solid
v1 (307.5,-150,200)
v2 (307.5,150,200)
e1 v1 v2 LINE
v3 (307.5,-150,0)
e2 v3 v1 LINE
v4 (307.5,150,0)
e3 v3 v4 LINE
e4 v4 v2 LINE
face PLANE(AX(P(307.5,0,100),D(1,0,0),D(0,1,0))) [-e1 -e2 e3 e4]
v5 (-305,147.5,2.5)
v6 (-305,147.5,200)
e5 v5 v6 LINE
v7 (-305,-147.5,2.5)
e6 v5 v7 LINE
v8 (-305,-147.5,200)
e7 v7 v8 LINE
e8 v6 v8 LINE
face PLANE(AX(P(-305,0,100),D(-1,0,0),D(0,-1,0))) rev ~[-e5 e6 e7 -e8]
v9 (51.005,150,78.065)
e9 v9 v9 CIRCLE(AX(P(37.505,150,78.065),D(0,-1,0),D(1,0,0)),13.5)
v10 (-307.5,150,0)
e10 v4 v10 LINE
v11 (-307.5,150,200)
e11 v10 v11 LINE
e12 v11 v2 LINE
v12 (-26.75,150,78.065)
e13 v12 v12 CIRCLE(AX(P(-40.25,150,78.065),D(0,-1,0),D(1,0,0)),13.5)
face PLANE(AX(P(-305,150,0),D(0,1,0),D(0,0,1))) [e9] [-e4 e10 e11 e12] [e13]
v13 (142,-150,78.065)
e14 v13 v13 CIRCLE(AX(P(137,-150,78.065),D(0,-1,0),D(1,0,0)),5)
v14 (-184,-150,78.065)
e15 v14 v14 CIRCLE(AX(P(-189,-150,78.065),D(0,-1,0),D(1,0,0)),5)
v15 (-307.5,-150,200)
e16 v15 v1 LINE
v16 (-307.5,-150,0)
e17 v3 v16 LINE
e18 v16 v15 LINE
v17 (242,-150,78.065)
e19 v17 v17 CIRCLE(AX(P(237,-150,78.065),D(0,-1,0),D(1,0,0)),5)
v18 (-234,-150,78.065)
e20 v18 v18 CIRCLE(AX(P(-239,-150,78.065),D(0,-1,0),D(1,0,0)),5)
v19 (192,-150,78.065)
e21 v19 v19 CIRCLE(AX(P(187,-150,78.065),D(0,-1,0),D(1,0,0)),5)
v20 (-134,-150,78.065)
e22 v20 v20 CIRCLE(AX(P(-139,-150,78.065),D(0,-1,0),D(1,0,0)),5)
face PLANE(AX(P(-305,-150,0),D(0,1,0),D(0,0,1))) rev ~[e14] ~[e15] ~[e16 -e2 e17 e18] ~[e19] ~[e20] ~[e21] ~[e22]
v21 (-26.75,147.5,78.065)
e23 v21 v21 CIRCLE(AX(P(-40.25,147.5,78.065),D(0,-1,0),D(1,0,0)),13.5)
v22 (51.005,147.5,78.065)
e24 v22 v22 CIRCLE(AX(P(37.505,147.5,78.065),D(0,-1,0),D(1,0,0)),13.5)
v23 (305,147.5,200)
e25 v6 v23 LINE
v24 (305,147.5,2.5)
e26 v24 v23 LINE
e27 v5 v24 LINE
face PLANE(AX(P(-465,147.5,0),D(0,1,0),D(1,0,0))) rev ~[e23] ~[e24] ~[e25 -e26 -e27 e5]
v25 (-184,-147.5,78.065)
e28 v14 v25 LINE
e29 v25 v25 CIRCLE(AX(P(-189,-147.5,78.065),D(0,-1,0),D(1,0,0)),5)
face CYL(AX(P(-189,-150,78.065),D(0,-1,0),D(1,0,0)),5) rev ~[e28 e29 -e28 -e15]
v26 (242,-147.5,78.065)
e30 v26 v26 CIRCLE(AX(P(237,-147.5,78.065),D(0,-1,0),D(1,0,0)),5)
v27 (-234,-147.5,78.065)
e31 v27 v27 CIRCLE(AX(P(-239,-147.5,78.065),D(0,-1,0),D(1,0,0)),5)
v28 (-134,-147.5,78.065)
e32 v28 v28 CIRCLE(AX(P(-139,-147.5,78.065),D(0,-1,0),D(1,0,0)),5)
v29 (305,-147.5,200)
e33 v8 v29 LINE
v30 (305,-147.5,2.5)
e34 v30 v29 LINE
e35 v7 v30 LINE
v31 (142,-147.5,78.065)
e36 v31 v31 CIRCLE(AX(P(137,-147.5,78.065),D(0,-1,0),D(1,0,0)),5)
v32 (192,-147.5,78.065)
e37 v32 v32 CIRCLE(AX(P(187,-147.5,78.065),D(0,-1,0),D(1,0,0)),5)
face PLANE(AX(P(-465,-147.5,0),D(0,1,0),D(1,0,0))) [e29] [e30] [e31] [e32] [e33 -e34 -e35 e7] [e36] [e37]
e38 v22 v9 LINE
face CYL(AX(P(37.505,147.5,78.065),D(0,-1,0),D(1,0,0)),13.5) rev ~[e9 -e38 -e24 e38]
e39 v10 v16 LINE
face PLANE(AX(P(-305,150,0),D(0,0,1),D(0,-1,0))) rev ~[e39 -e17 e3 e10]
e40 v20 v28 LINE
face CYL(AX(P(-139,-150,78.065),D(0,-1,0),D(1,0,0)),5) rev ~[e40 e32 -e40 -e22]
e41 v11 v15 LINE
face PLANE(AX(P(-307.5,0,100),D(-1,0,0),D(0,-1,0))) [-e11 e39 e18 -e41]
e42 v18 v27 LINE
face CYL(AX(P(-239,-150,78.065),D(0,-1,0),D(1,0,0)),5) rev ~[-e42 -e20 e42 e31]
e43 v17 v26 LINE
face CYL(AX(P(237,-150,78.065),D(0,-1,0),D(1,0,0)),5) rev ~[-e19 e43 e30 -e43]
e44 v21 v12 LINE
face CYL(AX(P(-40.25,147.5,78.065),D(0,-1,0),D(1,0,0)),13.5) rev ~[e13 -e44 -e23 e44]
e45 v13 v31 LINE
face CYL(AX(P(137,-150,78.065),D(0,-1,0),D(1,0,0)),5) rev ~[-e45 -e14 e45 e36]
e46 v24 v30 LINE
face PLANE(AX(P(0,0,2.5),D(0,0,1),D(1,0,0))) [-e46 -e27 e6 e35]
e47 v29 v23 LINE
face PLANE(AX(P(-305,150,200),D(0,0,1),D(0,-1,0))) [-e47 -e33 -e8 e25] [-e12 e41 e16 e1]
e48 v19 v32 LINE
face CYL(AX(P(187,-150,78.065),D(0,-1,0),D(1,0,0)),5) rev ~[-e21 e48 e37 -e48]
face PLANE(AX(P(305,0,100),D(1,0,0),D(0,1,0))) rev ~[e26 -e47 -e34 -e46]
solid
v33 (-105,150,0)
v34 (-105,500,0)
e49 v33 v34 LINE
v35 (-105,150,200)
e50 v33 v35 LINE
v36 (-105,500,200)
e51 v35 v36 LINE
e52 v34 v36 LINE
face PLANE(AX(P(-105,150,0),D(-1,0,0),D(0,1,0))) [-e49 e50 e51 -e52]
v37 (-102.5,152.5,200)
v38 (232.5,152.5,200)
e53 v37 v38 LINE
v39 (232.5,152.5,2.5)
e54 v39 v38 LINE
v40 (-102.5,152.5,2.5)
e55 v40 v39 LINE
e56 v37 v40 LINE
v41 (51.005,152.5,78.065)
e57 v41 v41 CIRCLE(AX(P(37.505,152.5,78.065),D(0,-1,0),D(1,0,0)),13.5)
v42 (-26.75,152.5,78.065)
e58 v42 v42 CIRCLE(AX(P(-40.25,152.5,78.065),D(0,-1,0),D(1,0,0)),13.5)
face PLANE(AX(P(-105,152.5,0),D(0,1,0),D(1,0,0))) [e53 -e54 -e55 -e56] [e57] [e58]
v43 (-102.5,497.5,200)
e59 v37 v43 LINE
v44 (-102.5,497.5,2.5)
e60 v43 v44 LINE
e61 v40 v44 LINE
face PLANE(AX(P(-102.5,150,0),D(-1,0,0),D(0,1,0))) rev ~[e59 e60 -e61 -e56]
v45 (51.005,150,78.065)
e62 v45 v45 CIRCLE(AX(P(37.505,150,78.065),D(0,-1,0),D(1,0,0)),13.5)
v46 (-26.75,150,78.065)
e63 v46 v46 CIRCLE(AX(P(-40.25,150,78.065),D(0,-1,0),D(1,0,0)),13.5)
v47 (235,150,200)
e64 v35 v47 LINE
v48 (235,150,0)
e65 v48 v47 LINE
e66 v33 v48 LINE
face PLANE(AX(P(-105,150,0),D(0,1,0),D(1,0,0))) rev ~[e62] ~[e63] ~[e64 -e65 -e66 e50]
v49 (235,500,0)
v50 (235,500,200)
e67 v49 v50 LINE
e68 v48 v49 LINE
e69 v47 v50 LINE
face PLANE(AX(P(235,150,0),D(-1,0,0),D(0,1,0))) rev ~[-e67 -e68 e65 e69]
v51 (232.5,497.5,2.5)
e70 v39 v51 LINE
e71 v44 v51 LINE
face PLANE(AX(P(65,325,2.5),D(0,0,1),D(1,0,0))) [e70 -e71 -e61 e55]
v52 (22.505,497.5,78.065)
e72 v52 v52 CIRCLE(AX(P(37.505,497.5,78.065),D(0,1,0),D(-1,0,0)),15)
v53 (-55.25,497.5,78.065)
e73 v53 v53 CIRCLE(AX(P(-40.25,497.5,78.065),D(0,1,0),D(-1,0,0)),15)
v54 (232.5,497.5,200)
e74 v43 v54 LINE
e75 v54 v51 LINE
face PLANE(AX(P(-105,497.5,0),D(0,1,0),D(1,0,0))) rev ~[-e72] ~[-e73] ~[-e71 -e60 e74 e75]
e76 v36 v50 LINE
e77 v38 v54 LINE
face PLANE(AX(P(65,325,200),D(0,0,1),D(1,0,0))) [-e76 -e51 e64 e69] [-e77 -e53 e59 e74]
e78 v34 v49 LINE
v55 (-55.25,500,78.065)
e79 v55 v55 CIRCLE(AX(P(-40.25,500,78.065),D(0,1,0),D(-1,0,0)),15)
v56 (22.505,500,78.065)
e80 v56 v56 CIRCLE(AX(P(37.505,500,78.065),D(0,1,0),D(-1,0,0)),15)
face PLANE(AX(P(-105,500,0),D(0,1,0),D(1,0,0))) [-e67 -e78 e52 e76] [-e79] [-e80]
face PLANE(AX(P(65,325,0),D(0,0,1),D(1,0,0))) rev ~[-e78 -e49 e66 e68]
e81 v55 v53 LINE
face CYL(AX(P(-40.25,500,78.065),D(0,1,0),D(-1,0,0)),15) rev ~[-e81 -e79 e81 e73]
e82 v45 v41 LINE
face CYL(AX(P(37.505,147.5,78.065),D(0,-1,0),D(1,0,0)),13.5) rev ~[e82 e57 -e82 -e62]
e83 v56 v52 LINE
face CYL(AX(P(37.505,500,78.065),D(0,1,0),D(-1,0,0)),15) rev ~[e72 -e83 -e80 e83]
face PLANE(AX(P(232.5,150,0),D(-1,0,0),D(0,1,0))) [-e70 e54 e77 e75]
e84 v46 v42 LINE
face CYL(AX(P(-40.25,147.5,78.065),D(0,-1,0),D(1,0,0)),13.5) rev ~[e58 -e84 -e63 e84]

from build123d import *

# Parameters (mm, degrees)
F0_W      = 930
F0_H      = 300
F2_DEPTH  = 200
F3_T      = -2.5
F1_W      = 340
F1_H      = 350
F4_DEPTH  = 200
F5_T      = -2.5
F6_R      = 5
F7_DEPTH  = 25
F8_R      = 13.5
F9_DEPTH  = 25
F10_R     = 15
F11_DEPTH = 25
F12_DEPTH = 160
F13_DEPTH = 160
F14_W     = 300
F14_H     = 200
F15_DEPTH = 2.5
F16_W     = 300
F16_H     = 200
F17_DEPTH = 2.5


# Not quite as in the source:
# - a feature names something its author has since deleted; it is built from what else it names


with BuildPart() as f2:
    # F0 (on Top) → F2 (new body)
    with BuildSketch(Plane.XY):
        Rectangle(F0_W, F0_H)
    extrude(amount=F2_DEPTH)

    # F3
    f3_openings = [f2.faces().sort_by_distance(p)[0] for p in [
        (0, 0, 200),
    ]]
    offset(amount=F3_T, openings=f3_openings)

    # F6 (on face) → F7 (cut)
    with BuildSketch(Plane.XZ.offset(150)):
        with Locations((137, 78.065)):
            Circle(F6_R)
        with Locations((187, 78.065)):
            Circle(F6_R)
        with Locations((237, 78.065)):
            Circle(F6_R)
        with Locations((387, 78.065)):
            Circle(F6_R)
        with Locations((337, 78.065)):
            Circle(F6_R)
        with Locations((-139, 78.065)):
            Circle(F6_R)
        with Locations((-189, 78.065)):
            Circle(F6_R)
        with Locations((-239, 78.065)):
            Circle(F6_R)
        with Locations((-339, 78.065)):
            Circle(F6_R)
        with Locations((-389, 78.065)):
            Circle(F6_R)
    extrude(amount=-F7_DEPTH, mode=Mode.SUBTRACT)


with BuildPart() as f4:
    # F1 (on Top) → F4 (new body)
    with BuildSketch(Plane.XY):
        with Locations((65, 325)):
            Rectangle(F1_W, F1_H)
    extrude(amount=F4_DEPTH)

    # F5
    f5_openings = [f4.faces().sort_by_distance(p)[0] for p in [
        (65, 325, 200),
    ]]
    offset(amount=F5_T, openings=f5_openings)


with BuildPart() as f9_tool:
    # F8 (on face) → F9 (new body)
    with BuildSketch(Plane.XZ.offset(-147.5)):
        with Locations((37.505, 78.065)):
            Circle(F8_R)
        with Locations((-40.25, 78.065)):
            Circle(F8_R)
    extrude(amount=-F9_DEPTH)


with BuildPart() as f2_1:
    add(f2.part)

    # F9: cut by f9_tool
    add(f9_tool.part, mode=Mode.SUBTRACT)

    # F12 (cut): a face of the model
    f12_faces = [f2_1.faces().sort_by_distance(p)[0] for p in [
        (-465, 0, 100),
    ]]
    extrude(f12_faces, amount=-F12_DEPTH, mode=Mode.SUBTRACT)

    # F13 (cut): a face of the model
    f13_faces = [f2_1.faces().sort_by_distance(p)[0] for p in [
        (465, 0, 100),
    ]]
    extrude(f13_faces, amount=-F13_DEPTH, mode=Mode.SUBTRACT)

    # F14 (on face) → F15 (join)
    with BuildSketch(Plane.YZ.offset(305)):
        with Locations((0, 100)):
            Rectangle(F14_W, F14_H)
    extrude(amount=F15_DEPTH)

    # F16 (on face) → F17 (join)
    with BuildSketch(Plane(origin=(-305, 0, 0), x_dir=(0, -1, 0), z_dir=(-1, 0, 0))):
        with Locations((0, 100)):
            Rectangle(F16_W, F16_H)
    extrude(amount=F17_DEPTH)


with BuildPart() as f4_1:
    add(f4.part)

    # F9: cut by f9_tool
    add(f9_tool.part, mode=Mode.SUBTRACT)

    # F10 (on face) → F11 (cut)
    with BuildSketch(Plane(origin=(0, 500, 0), x_dir=(-1, 0, 0), z_dir=(0, 1, 0))):
        with Locations((-37.505, 78.065)):
            Circle(F10_R)
        with Locations((40.25, 78.065)):
            Circle(F10_R)
    extrude(amount=-F11_DEPTH, mode=Mode.SUBTRACT)


solid = Compound([f2_1.part, f4_1.part])
